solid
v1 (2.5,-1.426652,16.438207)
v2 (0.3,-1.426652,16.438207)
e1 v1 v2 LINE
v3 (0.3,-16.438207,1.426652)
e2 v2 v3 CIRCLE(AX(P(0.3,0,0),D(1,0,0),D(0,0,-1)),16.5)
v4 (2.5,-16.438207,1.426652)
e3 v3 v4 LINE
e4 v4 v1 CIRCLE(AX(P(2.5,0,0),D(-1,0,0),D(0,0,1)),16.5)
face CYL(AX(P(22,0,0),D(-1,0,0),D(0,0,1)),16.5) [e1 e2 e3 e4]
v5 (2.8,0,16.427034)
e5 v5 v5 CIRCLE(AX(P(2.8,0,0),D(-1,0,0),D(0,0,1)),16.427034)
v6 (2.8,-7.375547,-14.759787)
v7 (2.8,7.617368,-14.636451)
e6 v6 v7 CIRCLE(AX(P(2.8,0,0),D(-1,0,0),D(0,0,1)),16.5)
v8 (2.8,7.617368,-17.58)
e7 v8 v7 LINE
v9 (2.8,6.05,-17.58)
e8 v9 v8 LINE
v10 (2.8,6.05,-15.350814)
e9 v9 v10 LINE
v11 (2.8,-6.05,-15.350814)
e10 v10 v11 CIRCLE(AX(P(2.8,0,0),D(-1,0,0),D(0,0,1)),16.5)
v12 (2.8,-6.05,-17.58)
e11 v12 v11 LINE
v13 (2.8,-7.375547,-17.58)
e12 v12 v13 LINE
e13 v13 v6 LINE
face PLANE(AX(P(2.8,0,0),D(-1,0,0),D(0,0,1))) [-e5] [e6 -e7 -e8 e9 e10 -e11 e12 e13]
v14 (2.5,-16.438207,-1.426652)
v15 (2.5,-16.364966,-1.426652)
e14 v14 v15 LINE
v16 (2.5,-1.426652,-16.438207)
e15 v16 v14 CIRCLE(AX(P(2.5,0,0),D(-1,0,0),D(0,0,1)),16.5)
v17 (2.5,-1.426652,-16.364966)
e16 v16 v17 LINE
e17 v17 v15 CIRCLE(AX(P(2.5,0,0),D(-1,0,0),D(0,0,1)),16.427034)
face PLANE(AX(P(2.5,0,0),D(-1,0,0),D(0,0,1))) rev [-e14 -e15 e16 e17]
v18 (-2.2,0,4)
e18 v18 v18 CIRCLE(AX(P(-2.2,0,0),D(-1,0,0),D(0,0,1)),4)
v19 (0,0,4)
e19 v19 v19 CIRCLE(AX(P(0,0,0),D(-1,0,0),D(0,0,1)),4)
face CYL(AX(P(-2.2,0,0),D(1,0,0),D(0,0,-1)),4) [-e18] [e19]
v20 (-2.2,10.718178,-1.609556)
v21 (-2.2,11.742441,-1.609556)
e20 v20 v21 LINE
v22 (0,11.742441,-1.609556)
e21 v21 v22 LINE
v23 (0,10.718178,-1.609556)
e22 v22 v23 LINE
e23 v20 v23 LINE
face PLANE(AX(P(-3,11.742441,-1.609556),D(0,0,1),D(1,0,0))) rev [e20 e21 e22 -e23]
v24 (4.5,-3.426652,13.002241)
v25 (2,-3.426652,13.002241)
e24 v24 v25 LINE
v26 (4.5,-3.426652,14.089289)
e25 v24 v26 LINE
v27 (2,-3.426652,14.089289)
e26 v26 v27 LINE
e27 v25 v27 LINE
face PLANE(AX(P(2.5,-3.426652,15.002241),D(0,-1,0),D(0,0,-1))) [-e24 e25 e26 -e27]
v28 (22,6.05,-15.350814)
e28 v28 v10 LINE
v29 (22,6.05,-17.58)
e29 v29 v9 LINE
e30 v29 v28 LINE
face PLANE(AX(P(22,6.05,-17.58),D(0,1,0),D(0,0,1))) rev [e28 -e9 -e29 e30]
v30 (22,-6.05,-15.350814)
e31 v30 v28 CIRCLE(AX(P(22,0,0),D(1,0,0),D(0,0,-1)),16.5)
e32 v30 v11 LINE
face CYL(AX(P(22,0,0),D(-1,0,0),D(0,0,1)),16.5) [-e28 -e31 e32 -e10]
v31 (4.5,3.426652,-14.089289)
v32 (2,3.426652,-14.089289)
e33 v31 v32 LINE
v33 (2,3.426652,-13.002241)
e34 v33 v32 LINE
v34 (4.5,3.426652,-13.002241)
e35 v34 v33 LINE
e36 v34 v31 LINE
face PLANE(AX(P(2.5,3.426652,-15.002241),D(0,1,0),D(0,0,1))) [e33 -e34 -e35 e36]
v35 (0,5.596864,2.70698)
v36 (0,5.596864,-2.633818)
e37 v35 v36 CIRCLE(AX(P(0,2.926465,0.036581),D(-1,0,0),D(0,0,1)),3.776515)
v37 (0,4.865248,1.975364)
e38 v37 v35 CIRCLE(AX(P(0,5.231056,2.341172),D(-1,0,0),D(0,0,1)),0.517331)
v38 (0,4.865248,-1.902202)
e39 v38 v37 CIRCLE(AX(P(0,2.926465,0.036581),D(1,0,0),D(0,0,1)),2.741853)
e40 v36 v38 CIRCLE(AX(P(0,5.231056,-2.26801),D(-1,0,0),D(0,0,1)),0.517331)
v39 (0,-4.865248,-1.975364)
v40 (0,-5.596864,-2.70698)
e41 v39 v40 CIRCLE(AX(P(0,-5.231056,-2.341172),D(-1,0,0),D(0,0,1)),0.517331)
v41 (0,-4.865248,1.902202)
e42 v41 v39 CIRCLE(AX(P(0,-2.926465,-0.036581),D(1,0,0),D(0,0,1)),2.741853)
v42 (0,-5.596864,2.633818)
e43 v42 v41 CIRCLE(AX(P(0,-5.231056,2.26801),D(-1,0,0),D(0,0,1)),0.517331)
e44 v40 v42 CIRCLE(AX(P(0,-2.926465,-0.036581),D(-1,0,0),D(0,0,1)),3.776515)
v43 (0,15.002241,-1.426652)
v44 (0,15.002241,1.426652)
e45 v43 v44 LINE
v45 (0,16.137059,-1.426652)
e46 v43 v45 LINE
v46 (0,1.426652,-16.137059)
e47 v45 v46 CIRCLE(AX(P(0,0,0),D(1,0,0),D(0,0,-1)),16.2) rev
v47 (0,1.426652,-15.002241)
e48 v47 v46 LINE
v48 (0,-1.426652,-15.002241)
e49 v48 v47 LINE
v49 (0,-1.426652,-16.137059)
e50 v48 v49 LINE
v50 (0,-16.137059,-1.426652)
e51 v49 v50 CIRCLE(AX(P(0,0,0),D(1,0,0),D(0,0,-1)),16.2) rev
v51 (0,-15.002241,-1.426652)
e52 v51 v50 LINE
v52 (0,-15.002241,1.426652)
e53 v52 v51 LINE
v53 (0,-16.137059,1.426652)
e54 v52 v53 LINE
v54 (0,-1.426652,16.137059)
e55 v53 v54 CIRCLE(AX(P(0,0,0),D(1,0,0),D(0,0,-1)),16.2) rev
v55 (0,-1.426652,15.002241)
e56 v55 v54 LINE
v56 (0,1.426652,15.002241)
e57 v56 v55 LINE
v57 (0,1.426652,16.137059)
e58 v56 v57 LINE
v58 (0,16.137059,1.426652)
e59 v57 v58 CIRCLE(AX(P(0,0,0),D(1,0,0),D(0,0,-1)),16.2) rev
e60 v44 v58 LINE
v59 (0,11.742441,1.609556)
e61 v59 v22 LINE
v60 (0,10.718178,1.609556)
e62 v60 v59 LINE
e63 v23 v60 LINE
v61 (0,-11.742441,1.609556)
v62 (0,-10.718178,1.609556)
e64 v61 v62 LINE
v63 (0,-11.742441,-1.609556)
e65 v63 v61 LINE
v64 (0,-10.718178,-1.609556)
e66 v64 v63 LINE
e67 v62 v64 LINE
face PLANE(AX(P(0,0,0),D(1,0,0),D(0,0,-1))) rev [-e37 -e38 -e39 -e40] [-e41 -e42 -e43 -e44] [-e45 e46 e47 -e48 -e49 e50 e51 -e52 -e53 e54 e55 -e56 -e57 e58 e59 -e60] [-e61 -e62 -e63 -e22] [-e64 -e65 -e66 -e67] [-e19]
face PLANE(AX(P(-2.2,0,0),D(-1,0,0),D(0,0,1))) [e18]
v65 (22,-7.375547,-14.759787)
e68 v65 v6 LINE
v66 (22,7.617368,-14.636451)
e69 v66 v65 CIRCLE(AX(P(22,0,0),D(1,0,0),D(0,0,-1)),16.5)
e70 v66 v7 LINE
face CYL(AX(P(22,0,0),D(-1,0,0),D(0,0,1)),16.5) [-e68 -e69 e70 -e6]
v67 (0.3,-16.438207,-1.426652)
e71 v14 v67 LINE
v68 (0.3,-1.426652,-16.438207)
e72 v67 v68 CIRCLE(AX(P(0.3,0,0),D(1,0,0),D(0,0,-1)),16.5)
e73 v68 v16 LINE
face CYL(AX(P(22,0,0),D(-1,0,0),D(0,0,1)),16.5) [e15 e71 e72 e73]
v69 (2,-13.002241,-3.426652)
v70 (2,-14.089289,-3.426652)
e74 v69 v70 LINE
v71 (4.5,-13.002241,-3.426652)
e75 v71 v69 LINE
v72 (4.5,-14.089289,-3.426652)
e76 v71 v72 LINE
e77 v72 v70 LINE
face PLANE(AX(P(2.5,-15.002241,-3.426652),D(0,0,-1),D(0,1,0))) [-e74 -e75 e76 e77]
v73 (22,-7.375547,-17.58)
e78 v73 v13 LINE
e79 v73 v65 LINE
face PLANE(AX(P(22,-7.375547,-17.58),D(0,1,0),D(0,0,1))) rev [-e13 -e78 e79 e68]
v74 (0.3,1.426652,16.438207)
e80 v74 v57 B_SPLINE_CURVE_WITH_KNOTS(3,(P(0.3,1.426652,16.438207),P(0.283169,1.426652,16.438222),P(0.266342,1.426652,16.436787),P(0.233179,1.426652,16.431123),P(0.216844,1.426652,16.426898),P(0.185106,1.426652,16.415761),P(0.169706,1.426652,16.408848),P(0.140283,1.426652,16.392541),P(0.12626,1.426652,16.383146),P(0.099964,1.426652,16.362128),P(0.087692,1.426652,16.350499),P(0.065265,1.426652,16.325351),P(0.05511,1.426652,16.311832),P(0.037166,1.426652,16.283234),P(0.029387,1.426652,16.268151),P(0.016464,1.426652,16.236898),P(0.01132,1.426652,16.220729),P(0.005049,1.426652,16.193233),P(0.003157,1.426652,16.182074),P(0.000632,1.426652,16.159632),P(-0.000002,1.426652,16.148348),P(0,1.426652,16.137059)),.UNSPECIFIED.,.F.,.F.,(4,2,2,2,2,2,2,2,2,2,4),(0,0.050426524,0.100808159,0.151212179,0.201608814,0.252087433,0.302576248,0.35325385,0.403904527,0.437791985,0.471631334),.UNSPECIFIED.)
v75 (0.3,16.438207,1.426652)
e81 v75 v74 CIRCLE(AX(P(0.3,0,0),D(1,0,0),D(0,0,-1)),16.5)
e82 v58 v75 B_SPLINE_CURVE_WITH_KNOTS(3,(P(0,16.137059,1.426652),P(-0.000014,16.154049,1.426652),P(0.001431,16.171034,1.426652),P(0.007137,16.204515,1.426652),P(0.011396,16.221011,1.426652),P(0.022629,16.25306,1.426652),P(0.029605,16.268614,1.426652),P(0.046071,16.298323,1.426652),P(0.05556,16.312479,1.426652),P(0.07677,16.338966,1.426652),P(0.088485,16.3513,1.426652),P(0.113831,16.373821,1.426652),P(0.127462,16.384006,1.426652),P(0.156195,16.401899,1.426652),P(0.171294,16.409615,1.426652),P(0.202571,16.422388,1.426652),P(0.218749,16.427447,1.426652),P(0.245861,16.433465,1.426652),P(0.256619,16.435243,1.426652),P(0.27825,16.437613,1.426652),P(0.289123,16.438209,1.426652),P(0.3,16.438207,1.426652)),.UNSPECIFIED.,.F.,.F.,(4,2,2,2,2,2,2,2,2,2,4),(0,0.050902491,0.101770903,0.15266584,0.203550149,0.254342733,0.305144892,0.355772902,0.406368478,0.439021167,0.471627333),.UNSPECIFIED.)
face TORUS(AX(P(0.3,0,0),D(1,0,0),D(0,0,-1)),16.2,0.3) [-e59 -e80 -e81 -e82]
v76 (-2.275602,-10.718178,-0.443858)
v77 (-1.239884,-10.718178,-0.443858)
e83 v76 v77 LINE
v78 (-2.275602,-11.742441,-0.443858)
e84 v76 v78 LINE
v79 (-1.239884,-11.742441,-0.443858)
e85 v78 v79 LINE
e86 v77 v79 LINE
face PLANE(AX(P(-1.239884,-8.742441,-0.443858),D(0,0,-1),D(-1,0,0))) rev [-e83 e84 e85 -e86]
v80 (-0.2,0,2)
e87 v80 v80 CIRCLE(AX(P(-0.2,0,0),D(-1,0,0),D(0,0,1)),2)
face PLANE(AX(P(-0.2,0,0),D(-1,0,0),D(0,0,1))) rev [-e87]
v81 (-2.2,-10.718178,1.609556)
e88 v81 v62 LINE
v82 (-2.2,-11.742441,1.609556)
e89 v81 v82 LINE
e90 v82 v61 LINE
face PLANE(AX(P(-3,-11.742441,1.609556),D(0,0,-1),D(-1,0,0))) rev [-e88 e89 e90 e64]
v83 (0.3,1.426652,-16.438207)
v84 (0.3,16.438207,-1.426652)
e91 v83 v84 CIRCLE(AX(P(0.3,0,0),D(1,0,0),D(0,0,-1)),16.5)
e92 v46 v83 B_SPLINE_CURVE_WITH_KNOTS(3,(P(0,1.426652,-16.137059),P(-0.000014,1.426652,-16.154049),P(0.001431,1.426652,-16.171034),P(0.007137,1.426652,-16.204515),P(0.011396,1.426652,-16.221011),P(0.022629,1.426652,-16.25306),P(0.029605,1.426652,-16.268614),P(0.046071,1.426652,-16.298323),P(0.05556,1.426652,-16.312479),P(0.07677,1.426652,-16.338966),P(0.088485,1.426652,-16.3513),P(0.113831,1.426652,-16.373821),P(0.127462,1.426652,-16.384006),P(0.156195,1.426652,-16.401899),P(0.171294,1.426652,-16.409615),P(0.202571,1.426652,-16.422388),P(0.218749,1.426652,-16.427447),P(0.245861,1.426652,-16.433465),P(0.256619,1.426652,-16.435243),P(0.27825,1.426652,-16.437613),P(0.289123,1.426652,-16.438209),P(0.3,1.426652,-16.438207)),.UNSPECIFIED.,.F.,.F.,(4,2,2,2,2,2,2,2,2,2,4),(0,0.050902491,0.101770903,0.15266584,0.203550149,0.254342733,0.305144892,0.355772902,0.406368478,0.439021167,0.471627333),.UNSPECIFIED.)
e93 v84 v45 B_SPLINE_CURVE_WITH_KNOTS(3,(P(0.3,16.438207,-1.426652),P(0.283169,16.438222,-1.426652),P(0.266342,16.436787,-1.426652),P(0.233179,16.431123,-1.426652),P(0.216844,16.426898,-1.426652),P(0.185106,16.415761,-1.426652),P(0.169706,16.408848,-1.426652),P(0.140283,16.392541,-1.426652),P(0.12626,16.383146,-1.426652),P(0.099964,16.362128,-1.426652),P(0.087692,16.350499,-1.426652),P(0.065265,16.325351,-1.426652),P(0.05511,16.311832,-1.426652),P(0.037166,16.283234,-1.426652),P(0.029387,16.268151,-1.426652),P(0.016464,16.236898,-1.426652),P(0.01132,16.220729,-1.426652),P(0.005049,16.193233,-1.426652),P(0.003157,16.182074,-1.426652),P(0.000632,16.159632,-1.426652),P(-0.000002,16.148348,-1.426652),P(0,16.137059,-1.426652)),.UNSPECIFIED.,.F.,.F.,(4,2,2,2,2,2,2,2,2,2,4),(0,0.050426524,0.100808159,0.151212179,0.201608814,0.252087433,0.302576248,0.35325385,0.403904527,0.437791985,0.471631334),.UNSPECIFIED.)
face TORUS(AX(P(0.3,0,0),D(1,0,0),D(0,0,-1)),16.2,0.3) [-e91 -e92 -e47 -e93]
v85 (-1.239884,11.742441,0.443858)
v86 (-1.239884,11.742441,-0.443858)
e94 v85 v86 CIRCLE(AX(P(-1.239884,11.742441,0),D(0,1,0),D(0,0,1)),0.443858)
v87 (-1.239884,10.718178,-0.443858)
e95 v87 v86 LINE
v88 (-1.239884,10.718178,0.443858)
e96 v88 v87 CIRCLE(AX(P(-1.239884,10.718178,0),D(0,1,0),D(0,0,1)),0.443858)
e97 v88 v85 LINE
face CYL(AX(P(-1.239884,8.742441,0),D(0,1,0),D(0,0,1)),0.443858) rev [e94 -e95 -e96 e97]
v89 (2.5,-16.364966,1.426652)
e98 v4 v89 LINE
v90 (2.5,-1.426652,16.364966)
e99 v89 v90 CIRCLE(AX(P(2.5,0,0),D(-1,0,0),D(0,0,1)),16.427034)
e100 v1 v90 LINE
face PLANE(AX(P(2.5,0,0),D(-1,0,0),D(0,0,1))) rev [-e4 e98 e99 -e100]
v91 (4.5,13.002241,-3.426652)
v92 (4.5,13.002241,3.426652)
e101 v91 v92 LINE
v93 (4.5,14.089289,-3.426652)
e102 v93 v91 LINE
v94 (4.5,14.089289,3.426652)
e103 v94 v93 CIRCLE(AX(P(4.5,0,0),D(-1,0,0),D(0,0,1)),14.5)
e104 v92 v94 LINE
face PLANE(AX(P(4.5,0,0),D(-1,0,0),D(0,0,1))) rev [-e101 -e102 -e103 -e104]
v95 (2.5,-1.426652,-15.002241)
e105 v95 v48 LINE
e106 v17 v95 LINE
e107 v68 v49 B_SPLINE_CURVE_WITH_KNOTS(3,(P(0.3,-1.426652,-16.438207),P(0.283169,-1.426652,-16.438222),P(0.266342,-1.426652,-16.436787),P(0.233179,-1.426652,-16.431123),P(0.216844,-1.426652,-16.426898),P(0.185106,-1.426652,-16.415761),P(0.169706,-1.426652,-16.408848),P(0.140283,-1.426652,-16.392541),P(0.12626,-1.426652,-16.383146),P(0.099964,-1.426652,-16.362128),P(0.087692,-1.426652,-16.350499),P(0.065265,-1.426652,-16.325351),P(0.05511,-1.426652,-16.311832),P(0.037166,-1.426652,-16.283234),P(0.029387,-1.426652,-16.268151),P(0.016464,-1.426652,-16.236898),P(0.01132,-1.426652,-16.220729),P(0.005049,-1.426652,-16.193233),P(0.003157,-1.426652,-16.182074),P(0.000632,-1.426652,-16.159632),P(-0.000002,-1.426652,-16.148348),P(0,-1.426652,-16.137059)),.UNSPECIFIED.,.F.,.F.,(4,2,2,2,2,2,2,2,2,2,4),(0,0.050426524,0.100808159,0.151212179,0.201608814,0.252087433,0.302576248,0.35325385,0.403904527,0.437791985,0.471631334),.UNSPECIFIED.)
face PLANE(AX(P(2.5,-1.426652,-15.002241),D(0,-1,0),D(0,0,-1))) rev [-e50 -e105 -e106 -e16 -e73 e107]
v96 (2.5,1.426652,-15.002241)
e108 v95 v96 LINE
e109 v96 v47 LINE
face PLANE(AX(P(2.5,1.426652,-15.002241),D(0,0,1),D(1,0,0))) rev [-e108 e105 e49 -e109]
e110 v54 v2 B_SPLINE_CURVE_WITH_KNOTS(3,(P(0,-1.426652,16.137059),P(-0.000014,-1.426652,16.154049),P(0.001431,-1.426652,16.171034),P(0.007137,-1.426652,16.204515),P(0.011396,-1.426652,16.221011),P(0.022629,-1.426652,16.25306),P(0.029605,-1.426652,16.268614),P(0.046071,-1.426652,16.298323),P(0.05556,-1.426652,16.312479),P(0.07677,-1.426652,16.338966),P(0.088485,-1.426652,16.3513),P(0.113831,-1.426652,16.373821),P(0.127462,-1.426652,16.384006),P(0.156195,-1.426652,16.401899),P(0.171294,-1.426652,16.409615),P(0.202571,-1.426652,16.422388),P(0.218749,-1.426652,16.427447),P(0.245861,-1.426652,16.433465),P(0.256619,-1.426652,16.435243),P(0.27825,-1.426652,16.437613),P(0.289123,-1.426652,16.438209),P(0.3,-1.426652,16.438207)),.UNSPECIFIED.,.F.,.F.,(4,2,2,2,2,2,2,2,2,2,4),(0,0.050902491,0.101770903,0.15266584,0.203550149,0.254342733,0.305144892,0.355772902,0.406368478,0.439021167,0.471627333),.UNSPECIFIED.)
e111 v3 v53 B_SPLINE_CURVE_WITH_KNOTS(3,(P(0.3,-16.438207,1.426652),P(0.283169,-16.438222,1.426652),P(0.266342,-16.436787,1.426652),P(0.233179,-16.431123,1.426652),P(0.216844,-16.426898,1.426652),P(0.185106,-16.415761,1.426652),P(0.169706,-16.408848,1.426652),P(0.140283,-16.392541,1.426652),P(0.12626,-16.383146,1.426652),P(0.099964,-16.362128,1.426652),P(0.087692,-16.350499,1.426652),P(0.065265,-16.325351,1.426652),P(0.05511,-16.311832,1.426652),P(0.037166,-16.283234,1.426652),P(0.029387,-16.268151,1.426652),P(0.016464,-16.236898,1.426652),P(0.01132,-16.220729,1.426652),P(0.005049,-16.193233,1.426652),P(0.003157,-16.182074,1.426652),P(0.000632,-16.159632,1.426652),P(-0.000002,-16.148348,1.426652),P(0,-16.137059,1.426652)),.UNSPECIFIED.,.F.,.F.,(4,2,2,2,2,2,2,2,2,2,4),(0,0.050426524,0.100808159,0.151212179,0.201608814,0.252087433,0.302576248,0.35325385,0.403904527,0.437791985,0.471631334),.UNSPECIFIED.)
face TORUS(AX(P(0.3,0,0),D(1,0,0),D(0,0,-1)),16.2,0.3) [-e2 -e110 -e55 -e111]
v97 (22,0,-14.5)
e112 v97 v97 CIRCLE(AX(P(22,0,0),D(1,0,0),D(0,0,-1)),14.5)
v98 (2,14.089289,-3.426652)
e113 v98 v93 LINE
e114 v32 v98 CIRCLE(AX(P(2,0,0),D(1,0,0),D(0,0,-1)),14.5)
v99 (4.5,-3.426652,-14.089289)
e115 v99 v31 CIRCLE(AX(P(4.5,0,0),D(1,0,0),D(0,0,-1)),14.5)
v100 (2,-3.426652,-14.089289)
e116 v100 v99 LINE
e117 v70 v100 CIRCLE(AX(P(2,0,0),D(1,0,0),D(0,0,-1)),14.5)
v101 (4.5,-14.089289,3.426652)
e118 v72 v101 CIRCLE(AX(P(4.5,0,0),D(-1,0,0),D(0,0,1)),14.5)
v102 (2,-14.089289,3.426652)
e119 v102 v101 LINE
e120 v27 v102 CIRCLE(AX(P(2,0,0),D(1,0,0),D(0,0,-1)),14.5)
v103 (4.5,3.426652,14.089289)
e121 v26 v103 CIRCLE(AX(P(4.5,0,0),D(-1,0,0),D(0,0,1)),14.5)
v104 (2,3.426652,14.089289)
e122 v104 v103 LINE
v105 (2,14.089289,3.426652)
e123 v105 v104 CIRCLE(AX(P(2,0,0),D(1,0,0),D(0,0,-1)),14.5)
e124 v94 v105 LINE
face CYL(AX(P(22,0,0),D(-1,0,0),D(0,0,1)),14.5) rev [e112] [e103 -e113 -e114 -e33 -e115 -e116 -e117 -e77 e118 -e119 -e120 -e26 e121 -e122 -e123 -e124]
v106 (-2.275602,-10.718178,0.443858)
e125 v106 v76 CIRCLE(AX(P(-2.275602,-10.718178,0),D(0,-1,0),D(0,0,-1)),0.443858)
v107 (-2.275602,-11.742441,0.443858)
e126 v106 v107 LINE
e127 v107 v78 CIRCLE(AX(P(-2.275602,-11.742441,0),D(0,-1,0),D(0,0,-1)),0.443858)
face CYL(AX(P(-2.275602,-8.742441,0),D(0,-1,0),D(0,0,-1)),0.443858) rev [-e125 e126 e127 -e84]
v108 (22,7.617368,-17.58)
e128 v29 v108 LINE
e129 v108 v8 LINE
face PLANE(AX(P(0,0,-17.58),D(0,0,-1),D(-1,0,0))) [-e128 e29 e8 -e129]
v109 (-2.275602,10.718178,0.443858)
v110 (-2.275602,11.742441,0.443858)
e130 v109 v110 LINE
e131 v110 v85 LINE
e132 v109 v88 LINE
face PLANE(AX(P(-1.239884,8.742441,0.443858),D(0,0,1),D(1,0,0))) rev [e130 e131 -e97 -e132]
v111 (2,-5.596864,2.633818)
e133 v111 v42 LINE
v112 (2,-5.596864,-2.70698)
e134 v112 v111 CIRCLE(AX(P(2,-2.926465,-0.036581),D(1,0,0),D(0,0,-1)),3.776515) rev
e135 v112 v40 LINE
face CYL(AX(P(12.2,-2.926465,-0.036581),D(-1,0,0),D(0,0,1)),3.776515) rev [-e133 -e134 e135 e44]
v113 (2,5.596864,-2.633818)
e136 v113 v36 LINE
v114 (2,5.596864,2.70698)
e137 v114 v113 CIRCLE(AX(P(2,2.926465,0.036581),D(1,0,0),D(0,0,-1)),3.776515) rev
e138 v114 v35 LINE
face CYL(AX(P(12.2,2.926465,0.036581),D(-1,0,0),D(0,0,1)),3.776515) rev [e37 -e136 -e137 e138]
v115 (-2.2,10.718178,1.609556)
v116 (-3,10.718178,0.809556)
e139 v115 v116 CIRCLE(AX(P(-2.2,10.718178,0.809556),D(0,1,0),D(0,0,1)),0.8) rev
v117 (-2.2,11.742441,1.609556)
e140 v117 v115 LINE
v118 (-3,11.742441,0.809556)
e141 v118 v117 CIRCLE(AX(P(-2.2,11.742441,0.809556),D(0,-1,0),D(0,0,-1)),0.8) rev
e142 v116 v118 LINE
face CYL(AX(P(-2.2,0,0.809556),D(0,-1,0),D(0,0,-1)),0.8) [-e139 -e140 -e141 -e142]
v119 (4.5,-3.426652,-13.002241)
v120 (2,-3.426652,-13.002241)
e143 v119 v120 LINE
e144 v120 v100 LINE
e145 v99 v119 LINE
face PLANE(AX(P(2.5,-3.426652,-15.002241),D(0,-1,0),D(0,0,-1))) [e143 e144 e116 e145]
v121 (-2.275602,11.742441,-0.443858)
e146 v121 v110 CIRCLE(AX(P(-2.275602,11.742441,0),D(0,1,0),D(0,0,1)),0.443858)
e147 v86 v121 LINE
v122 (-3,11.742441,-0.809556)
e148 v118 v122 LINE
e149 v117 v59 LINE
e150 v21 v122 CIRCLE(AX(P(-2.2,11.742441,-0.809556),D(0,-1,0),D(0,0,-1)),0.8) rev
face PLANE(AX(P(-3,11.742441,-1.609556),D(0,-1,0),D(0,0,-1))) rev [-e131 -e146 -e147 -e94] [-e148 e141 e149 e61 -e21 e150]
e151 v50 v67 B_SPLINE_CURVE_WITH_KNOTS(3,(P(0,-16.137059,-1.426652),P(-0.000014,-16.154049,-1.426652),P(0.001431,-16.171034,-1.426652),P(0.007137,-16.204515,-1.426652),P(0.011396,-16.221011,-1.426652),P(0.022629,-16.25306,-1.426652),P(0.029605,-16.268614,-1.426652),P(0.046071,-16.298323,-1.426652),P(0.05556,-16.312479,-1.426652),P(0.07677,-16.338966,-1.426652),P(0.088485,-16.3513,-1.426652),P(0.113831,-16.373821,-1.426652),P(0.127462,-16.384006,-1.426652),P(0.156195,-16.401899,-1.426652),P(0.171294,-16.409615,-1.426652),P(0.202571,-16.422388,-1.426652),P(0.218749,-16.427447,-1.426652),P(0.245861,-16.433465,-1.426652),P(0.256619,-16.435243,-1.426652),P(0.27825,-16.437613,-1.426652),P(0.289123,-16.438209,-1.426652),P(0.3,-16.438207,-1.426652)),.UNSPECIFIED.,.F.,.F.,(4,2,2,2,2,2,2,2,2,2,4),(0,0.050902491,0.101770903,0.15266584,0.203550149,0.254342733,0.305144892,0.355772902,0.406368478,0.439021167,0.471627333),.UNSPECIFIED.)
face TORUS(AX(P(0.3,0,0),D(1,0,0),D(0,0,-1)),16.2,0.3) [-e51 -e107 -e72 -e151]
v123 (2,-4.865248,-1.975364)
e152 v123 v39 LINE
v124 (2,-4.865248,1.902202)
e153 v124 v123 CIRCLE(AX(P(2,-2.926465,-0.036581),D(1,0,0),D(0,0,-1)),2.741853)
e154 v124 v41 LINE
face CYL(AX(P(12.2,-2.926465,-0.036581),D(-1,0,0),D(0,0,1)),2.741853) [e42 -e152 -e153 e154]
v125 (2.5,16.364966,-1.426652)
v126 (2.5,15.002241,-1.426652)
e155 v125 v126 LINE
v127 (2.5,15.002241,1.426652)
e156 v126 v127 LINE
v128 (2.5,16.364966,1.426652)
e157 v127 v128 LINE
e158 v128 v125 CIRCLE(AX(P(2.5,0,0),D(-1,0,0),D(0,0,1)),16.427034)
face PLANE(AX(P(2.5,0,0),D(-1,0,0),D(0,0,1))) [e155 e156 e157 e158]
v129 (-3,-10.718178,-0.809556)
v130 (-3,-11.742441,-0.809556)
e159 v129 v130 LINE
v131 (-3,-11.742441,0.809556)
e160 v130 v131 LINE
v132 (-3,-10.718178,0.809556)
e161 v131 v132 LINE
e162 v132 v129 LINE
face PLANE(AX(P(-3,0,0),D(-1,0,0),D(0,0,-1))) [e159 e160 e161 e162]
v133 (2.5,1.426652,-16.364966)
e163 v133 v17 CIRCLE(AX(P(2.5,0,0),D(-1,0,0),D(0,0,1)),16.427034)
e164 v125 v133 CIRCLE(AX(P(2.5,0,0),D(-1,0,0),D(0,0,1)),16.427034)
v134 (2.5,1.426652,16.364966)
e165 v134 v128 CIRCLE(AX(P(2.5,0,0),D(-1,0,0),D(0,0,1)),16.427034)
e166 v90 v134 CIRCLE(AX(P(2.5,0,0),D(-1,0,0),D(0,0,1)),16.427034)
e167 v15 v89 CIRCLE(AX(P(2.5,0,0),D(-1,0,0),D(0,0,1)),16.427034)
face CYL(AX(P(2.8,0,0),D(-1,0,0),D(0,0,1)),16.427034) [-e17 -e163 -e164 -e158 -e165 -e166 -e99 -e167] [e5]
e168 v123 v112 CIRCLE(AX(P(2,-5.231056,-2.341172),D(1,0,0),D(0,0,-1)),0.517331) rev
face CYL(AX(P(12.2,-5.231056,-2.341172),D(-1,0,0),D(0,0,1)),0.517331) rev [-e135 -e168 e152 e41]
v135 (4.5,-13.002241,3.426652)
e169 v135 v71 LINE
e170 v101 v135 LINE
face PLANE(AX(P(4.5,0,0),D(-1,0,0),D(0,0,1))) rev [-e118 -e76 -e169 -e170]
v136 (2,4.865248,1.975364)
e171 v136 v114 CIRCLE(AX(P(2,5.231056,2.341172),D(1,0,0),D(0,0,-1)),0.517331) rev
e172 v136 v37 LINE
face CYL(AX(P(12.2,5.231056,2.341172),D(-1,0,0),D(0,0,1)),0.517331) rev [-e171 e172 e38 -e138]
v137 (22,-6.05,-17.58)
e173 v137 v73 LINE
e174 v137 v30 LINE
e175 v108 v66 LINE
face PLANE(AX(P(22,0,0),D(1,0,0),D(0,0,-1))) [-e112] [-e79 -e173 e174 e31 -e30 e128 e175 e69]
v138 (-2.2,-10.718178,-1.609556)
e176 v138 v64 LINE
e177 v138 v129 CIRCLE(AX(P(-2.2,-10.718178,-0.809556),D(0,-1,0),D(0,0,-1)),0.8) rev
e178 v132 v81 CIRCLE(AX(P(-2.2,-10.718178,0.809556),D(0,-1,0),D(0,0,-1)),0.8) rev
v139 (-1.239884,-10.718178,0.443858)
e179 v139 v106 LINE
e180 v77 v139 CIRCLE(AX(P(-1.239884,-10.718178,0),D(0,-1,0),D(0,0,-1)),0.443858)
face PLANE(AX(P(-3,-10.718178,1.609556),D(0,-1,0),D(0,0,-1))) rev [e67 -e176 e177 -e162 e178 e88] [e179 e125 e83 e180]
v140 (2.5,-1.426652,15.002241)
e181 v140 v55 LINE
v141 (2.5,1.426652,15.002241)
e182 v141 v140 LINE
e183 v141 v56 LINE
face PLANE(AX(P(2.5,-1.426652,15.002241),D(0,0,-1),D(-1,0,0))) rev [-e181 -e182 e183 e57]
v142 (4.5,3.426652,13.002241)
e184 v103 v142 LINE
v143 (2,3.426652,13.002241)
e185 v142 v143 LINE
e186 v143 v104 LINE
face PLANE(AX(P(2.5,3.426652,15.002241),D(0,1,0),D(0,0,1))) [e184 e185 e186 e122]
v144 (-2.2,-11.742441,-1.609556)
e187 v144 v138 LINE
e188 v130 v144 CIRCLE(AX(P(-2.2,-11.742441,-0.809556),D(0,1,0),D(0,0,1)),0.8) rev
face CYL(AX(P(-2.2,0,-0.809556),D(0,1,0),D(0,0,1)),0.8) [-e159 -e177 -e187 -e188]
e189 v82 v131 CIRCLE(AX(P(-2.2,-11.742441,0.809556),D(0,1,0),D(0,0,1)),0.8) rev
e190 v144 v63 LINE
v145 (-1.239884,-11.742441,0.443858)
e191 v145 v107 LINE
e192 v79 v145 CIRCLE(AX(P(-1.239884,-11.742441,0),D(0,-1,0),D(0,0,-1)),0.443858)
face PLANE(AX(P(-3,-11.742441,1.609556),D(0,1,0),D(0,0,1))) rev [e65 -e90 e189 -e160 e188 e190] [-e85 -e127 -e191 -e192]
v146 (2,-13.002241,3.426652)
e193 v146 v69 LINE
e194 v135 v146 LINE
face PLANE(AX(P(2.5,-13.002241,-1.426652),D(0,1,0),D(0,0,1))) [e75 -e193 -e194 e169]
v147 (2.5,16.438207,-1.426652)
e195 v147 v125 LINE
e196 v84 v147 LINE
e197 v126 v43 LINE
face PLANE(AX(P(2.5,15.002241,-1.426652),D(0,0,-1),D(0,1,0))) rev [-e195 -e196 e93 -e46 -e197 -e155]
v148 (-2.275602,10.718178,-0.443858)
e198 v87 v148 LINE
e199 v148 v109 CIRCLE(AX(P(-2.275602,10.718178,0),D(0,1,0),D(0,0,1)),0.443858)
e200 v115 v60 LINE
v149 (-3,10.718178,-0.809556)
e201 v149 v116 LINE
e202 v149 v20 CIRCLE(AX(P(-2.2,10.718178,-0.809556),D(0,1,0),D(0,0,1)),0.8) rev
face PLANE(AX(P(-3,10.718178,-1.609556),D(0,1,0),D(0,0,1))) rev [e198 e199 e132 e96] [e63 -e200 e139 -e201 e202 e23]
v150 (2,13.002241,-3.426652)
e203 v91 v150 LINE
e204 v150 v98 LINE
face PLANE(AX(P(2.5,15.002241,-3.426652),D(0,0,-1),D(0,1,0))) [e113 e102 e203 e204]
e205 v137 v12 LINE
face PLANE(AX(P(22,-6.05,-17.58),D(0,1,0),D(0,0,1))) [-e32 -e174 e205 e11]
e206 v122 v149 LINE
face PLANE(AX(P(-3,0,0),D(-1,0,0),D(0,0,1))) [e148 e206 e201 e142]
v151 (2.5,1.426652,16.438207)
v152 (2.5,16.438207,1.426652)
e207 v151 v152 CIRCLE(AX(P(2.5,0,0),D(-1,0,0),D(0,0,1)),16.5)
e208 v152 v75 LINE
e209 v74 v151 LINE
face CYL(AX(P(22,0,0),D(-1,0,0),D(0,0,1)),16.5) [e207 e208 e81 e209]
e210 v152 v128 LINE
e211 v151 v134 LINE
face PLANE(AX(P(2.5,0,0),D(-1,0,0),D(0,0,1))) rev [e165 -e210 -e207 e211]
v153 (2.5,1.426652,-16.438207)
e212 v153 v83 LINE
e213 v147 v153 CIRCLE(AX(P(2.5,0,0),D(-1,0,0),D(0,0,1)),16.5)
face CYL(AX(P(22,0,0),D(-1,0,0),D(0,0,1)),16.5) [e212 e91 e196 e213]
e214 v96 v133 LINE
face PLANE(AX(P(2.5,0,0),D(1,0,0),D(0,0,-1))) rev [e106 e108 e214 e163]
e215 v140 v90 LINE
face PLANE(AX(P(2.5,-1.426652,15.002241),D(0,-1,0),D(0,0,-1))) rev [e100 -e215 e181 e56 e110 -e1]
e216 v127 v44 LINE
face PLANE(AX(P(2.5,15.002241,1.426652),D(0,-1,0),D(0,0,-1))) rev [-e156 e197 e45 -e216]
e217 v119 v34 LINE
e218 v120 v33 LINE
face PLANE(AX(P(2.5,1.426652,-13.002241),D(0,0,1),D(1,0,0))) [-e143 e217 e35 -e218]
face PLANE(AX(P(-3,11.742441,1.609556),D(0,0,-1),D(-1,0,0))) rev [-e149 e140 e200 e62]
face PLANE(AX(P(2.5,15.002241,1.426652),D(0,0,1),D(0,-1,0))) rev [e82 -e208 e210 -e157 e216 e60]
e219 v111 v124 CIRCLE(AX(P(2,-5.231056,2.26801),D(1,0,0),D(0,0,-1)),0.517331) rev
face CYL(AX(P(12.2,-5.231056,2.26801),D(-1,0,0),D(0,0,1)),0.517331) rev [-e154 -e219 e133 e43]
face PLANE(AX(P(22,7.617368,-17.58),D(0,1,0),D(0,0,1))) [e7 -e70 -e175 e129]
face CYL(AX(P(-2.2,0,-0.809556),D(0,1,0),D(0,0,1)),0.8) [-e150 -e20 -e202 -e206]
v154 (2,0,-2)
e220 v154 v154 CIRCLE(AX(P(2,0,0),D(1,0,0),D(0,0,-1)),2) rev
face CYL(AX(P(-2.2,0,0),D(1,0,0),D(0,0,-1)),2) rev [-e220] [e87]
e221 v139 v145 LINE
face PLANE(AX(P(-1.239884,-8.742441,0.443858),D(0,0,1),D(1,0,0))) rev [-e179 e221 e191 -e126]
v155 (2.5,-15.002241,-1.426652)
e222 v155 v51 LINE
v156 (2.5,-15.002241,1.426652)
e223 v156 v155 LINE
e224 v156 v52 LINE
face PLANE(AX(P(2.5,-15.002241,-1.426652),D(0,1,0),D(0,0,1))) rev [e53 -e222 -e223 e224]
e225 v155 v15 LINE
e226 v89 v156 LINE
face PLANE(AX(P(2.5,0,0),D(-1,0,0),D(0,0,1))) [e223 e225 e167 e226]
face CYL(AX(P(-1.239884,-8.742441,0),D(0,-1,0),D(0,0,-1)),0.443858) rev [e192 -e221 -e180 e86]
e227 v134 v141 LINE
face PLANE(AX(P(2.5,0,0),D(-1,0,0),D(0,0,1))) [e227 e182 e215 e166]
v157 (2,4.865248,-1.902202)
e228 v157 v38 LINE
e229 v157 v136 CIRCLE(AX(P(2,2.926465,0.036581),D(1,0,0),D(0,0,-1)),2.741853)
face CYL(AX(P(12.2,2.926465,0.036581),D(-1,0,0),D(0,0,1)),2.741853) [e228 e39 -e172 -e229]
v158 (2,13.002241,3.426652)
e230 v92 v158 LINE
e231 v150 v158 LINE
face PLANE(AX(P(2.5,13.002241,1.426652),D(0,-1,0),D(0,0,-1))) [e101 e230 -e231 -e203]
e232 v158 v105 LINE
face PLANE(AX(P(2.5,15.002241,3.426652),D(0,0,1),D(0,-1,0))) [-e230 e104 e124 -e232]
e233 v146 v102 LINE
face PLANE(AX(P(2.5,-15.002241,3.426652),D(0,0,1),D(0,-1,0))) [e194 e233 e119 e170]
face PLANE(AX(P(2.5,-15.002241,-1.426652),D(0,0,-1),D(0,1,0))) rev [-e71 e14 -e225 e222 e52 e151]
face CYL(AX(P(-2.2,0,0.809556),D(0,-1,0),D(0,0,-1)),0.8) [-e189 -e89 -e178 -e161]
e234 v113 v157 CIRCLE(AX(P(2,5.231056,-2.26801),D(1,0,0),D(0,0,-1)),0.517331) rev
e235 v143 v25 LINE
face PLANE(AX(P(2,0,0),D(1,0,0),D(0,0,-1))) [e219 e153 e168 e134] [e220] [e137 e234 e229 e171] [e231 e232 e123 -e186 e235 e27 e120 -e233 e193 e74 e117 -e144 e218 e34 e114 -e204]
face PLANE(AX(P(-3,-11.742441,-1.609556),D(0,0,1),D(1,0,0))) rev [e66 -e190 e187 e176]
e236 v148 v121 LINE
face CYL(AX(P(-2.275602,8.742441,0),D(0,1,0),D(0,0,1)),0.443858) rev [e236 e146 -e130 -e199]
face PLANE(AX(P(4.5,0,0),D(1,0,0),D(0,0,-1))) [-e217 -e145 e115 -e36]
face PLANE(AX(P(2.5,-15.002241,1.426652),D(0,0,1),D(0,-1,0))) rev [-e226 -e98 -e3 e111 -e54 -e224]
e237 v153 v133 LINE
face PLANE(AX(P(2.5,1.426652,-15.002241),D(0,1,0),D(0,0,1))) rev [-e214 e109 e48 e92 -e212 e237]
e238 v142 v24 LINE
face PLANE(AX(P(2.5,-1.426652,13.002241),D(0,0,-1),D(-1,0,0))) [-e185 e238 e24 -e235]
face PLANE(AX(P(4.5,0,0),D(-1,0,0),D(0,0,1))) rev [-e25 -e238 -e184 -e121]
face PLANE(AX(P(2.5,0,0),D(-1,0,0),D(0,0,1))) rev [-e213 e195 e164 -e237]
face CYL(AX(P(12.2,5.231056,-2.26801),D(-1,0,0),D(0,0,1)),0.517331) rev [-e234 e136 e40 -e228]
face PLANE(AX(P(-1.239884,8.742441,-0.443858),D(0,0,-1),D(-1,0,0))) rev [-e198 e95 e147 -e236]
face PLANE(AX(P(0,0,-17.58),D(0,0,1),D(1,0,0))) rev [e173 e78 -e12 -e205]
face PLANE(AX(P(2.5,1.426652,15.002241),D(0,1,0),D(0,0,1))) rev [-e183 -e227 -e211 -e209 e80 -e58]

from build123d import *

# Parameters (mm, degrees)
SKETCH1_R           = 16.5
BOSS_EXTRUDE1_DEPTH = 22
SKETCH2_W           = 2.99551857
SKETCH2_H           = 2.853303302
SKETCH2_W_2         = 2.853303302
SKETCH2_H_2         = 2.99551857
CUT_EXTRUDE1_DEPTH  = 2.5
SKETCH3_R           = 4
BOSS_EXTRUDE2_DEPTH = 2.2
CUT_EXTRUDE2_DEPTH  = 12.2
SKETCH5_W           = 3.219111416
SKETCH5_H           = 1.024262723
BOSS_EXTRUDE3_DEPTH = 3
CUT_EXTRUDE3_DEPTH  = 3
CIRPATTERN2_COUNT   = 2
SHELL1_START        = 2
SHELL1_DEPTH        = 20
SHELL1_START_2      = 14.2
SHELL1_2_DEPTH      = 7.8
SHELL1_START_3      = 4.5
SHELL1_3_DEPTH      = 9.7
SHELL1_START_4      = -0.2
SHELL1_4_OUTLINE_R  = 2
SHELL1_4_DEPTH      = 2.2
SKETCH7_R           = 9.780494134
CUT_EXTRUDE4_DEPTH  = 28
SKETCH8_R           = 16.5
SKETCH8_R_2         = 16.427034369
CUT_EXTRUDE5_DEPTH  = 0.3
FILLET1_R           = 0.3
FILLET2_R           = 0.8
SKETCH9_W           = 19.2
SKETCH9_H           = 1.567367832
SKETCH9_H_2         = 1.325546631
BOSS_EXTRUDE4_DEPTH = 3


# Read off the part's stored shape, not the designer's step: Shell1
with BuildPart() as part:
    # Sketch1 → Boss-Extrude1 (new body)
    with BuildSketch(Plane(origin=(0, 0, 0), x_dir=(0, 0, -1), z_dir=(1, 0, 0))):
        Circle(SKETCH1_R)
    extrude(amount=BOSS_EXTRUDE1_DEPTH)

    # Sketch2 → Cut-Extrude1 (cut)
    with BuildSketch(Plane.ZY):
        with Locations((-16.5, 0)):
            Rectangle(SKETCH2_W, SKETCH2_H)
        with Locations((0, 16.5)):
            Rectangle(SKETCH2_W_2, SKETCH2_H_2)
        with Locations((16.5, 0)):
            Rectangle(SKETCH2_W, SKETCH2_H)
        with Locations((0, -16.5)):
            Rectangle(SKETCH2_W_2, SKETCH2_H_2)
    extrude(amount=-CUT_EXTRUDE1_DEPTH, mode=Mode.SUBTRACT)

    # Sketch3 → Boss-Extrude2 (add)
    with BuildSketch(Plane.ZY):
        Circle(SKETCH3_R)
    extrude(amount=BOSS_EXTRUDE2_DEPTH)

    # Sketch4 → Cut-Extrude2 (cut)
    with BuildSketch(Plane.ZY):
        with BuildLine():
            ThreePointArc((2.706980055, 5.596864168), (0.036580812, 6.702979752), (-2.633818432, 5.596864168))
            ThreePointArc((-2.633818432, 5.596864168), (-2.633818432, 4.865247937), (-1.902202201, 4.865247937))
            ThreePointArc((-1.902202201, 4.865247937), (0.036580812, 5.668318155), (1.975363824, 4.865247937))
            ThreePointArc((1.975363824, 4.865247937), (2.706980055, 4.865247937), (2.706980055, 5.596864168))
        make_face()
        with BuildLine():
            ThreePointArc((-2.706980055, -5.596864168), (-0.036580812, -6.702979752), (2.633818432, -5.596864168))
            ThreePointArc((2.633818432, -5.596864168), (2.633818432, -4.865247937), (1.902202201, -4.865247937))
            ThreePointArc((1.902202201, -4.865247937), (-0.036580812, -5.668318155), (-1.975363824, -4.865247937))
            ThreePointArc((-1.975363824, -4.865247937), (-2.706980055, -4.865247937), (-2.706980055, -5.596864168))
        make_face()
    extrude(amount=-CUT_EXTRUDE2_DEPTH, mode=Mode.SUBTRACT)

    # Sketch5 → Boss-Extrude3 (add)
    with BuildSketch(Plane.ZY):
        with Locations((0, 11.230309148)):
            Rectangle(SKETCH5_W, SKETCH5_H)
    boss_extrude3 = extrude(amount=BOSS_EXTRUDE3_DEPTH)

    # Sketch6 → Cut-Extrude3 (cut)
    with BuildSketch(Plane(origin=(0, 11.742440509, 0), x_dir=(1, 0, 0), z_dir=(0, 1, 0))):
        with BuildLine():
            Line((-1.239883538, -0.443858464), (-2.275602474, -0.443858464))
            ThreePointArc((-2.275602474, -0.443858464), (-2.719460937, 0), (-2.275602474, 0.443858464))
            Line((-2.275602474, 0.443858464), (-1.239883538, 0.443858464))
            ThreePointArc((-1.239883538, 0.443858464), (-0.796025074, 0), (-1.239883538, -0.443858464))
        make_face()
    cut_extrude3 = extrude(amount=-CUT_EXTRUDE3_DEPTH, mode=Mode.SUBTRACT)

    # CirPattern2: Boss-Extrude3, Cut-Extrude3 ×2 about axis
    cirpattern2_axis = Axis((0, 0, 0), (1, 0, 0))
    add([boss_extrude3.rotate(cirpattern2_axis, i * 360 / CIRPATTERN2_COUNT) for i in range(1, CIRPATTERN2_COUNT)])
    add([cut_extrude3.rotate(cirpattern2_axis, i * 360 / CIRPATTERN2_COUNT) for i in range(1, CIRPATTERN2_COUNT)], mode=Mode.SUBTRACT)

    # Shell1 outline → Shell1 (cut)
    with BuildSketch(Plane.YZ.offset(SHELL1_START)):
        with BuildLine():
            Line((13.002240715, 3.426651651), (14.089288785, 3.426651651))
            ThreePointArc((14.089288785, 3.426651651), (10.253048327, 10.253048327), (3.426651651, 14.089288785))
            Line((3.426651651, 14.089288785), (3.426651651, 13.002240715))
            Line((3.426651651, 13.002240715), (-3.426651651, 13.002240715))
            Line((-3.426651651, 13.002240715), (-3.426651651, 14.089288785))
            ThreePointArc((-3.426651651, 14.089288785), (-10.253048327, 10.253048327), (-14.089288785, 3.426651651))
            Line((-14.089288785, 3.426651651), (-13.002240715, 3.426651651))
            Line((-13.002240715, 3.426651651), (-13.002240715, -3.426651651))
            Line((-13.002240715, -3.426651651), (-14.089288785, -3.426651651))
            ThreePointArc((-14.089288785, -3.426651651), (-10.253048327, -10.253048327), (-3.426651651, -14.089288785))
            Line((-3.426651651, -14.089288785), (-3.426651651, -13.002240715))
            Line((-3.426651651, -13.002240715), (3.426651651, -13.002240715))
            Line((3.426651651, -13.002240715), (3.426651651, -14.089288785))
            ThreePointArc((3.426651651, -14.089288785), (10.253048327, -10.253048327), (14.089288785, -3.426651651))
            Line((14.089288785, -3.426651651), (13.002240715, -3.426651651))
            Line((13.002240715, -3.426651651), (13.002240715, 3.426651651))
        make_face()
        with BuildLine():
            ThreePointArc((-3.451034375, 0.487988639), (-3.668318155, -0.036580811), (-3.451034375, -0.561150262))
            ThreePointArc((-3.451034375, -0.561150262), (-3.451034375, -4.121193617), (-7.01107773, -4.121193617))
            ThreePointArc((-7.01107773, -4.121193617), (-8.702979752, -0.036580811), (-7.01107773, 4.048031994))
            ThreePointArc((-7.01107773, 4.048031994), (-3.451034375, 4.048031994), (-3.451034375, 0.487988639))
        make_face(mode=Mode.SUBTRACT)
        with BuildLine():
            ThreePointArc((3.451034375, -0.487988639), (3.668318155, 0.036580811), (3.451034375, 0.561150262))
            ThreePointArc((3.451034375, 0.561150262), (3.451034375, 4.121193617), (7.01107773, 4.121193617))
            ThreePointArc((7.01107773, 4.121193617), (8.702979752, 0.036580811), (7.01107773, -4.048031994))
            ThreePointArc((7.01107773, -4.048031994), (3.451034375, -4.048031994), (3.451034375, -0.487988639))
        make_face(mode=Mode.SUBTRACT)
    extrude(amount=SHELL1_DEPTH, mode=Mode.SUBTRACT)

    # Shell1 2 outline → Shell1 2 (cut)
    with BuildSketch(Plane.YZ.offset(SHELL1_START_2)):
        with BuildLine():
            ThreePointArc((14.089288785, -3.426651651), (14.5, 0), (14.089288785, 3.426651651))
            Line((14.089288785, 3.426651651), (13.002240715, 3.426651651))
            Line((13.002240715, 3.426651651), (13.002240715, -3.426651651))
            Line((13.002240715, -3.426651651), (14.089288785, -3.426651651))
        make_face()
        with BuildLine():
            Line((3.426651651, 13.002240715), (3.426651651, 14.089288785))
            ThreePointArc((3.426651651, 14.089288785), (0, 14.5), (-3.426651651, 14.089288785))
            Line((-3.426651651, 14.089288785), (-3.426651651, 13.002240715))
            Line((-3.426651651, 13.002240715), (3.426651651, 13.002240715))
        make_face()
        with BuildLine():
            ThreePointArc((-3.426651651, -14.089288785), (0, -14.5), (3.426651651, -14.089288785))
            Line((3.426651651, -14.089288785), (3.426651651, -13.002240715))
            Line((3.426651651, -13.002240715), (-3.426651651, -13.002240715))
            Line((-3.426651651, -13.002240715), (-3.426651651, -14.089288785))
        make_face()
        with BuildLine():
            Line((-13.002240715, 3.426651651), (-14.089288785, 3.426651651))
            ThreePointArc((-14.089288785, 3.426651651), (-14.5, 0), (-14.089288785, -3.426651651))
            Line((-14.089288785, -3.426651651), (-13.002240715, -3.426651651))
            Line((-13.002240715, -3.426651651), (-13.002240715, 3.426651651))
        make_face()
        with BuildLine():
            ThreePointArc((-7.01107773, -4.121193617), (-3.451034375, -4.121193617), (-3.451034375, -0.561150262))
            ThreePointArc((-3.451034375, -0.561150262), (-3.668318155, -0.036580811), (-3.451034375, 0.487988639))
            ThreePointArc((-3.451034375, 0.487988639), (-3.451034375, 4.048031994), (-7.01107773, 4.048031994))
            ThreePointArc((-7.01107773, 4.048031994), (-8.702979752, -0.036580811), (-7.01107773, -4.121193617))
        make_face()
        with BuildLine():
            ThreePointArc((7.01107773, 4.121193617), (3.451034375, 4.121193617), (3.451034375, 0.561150262))
            ThreePointArc((3.451034375, 0.561150262), (3.668318155, 0.036580811), (3.451034375, -0.487988639))
            ThreePointArc((3.451034375, -0.487988639), (3.451034375, -4.048031994), (7.01107773, -4.048031994))
            ThreePointArc((7.01107773, -4.048031994), (8.702979752, 0.036580811), (7.01107773, 4.121193617))
        make_face()
    extrude(amount=SHELL1_2_DEPTH, mode=Mode.SUBTRACT)

    # Shell1 3 outline → Shell1 3 (cut)
    with BuildSketch(Plane.YZ.offset(SHELL1_START_3)):
        with BuildLine():
            ThreePointArc((14.089288785, -3.426651651), (14.5, 0), (14.089288785, 3.426651651))
            Line((14.089288785, 3.426651651), (13.002240715, 3.426651651))
            Line((13.002240715, 3.426651651), (13.002240715, -3.426651651))
            Line((13.002240715, -3.426651651), (14.089288785, -3.426651651))
        make_face()
        with BuildLine():
            Line((3.426651651, 13.002240715), (3.426651651, 14.089288785))
            ThreePointArc((3.426651651, 14.089288785), (0, 14.5), (-3.426651651, 14.089288785))
            Line((-3.426651651, 14.089288785), (-3.426651651, 13.002240715))
            Line((-3.426651651, 13.002240715), (3.426651651, 13.002240715))
        make_face()
        with BuildLine():
            ThreePointArc((-3.426651651, -14.089288785), (0, -14.5), (3.426651651, -14.089288785))
            Line((3.426651651, -14.089288785), (3.426651651, -13.002240715))
            Line((3.426651651, -13.002240715), (-3.426651651, -13.002240715))
            Line((-3.426651651, -13.002240715), (-3.426651651, -14.089288785))
        make_face()
        with BuildLine():
            Line((-13.002240715, 3.426651651), (-14.089288785, 3.426651651))
            ThreePointArc((-14.089288785, 3.426651651), (-14.5, 0), (-14.089288785, -3.426651651))
            Line((-14.089288785, -3.426651651), (-13.002240715, -3.426651651))
            Line((-13.002240715, -3.426651651), (-13.002240715, 3.426651651))
        make_face()
    extrude(amount=SHELL1_3_DEPTH, mode=Mode.SUBTRACT)

    # Shell1 4 outline → Shell1 4 (cut)
    with BuildSketch(Plane.YZ.offset(SHELL1_START_4)):
        Circle(SHELL1_4_OUTLINE_R)
    extrude(amount=SHELL1_4_DEPTH, mode=Mode.SUBTRACT)

    # Sketch7 → Cut-Extrude4 (cut)
    with BuildSketch(Plane(origin=(2, 0, 0), x_dir=(0, 0, -1), z_dir=(1, 0, 0))):
        Circle(SKETCH7_R)
    extrude(amount=CUT_EXTRUDE4_DEPTH, mode=Mode.SUBTRACT)

    # Sketch8 → Cut-Extrude5 (cut)
    with BuildSketch(Plane.ZY.offset(-2.5)):
        Circle(SKETCH8_R)
        Circle(SKETCH8_R_2, mode=Mode.SUBTRACT)
    extrude(amount=-CUT_EXTRUDE5_DEPTH, mode=Mode.SUBTRACT)

    # Fillet1
    fillet1_edges = [part.edges().sort_by_distance(p)[0] for p in [
        (0, 11.66726189, -11.66726189),
        (0, 11.66726189, 11.66726189),
        (0, -11.66726189, 11.66726189),
        (0, -11.66726189, -11.66726189),
    ]]
    fillet(fillet1_edges, radius=FILLET1_R)

    # Fillet2
    fillet2_edges = [part.edges().sort_by_distance(p)[0] for p in [
        (-3, 11.230309148, 1.609555708),
        (-3, 11.230309148, -1.609555708),
        (-3, -11.230309148, -1.609555708),
        (-3, -11.230309148, 1.609555708),
    ]]
    fillet(fillet2_edges, radius=FILLET2_R)

    # Sketch9 → Boss-Extrude4 (add)
    with BuildSketch(Plane.XY.offset(-14.58)):
        with Locations((12.4, 6.833683916)):
            Rectangle(SKETCH9_W, SKETCH9_H)
        with Locations((12.4, -6.712773316)):
            Rectangle(SKETCH9_W, SKETCH9_H_2)
    extrude(amount=-BOSS_EXTRUDE4_DEPTH)


solid = part.part
